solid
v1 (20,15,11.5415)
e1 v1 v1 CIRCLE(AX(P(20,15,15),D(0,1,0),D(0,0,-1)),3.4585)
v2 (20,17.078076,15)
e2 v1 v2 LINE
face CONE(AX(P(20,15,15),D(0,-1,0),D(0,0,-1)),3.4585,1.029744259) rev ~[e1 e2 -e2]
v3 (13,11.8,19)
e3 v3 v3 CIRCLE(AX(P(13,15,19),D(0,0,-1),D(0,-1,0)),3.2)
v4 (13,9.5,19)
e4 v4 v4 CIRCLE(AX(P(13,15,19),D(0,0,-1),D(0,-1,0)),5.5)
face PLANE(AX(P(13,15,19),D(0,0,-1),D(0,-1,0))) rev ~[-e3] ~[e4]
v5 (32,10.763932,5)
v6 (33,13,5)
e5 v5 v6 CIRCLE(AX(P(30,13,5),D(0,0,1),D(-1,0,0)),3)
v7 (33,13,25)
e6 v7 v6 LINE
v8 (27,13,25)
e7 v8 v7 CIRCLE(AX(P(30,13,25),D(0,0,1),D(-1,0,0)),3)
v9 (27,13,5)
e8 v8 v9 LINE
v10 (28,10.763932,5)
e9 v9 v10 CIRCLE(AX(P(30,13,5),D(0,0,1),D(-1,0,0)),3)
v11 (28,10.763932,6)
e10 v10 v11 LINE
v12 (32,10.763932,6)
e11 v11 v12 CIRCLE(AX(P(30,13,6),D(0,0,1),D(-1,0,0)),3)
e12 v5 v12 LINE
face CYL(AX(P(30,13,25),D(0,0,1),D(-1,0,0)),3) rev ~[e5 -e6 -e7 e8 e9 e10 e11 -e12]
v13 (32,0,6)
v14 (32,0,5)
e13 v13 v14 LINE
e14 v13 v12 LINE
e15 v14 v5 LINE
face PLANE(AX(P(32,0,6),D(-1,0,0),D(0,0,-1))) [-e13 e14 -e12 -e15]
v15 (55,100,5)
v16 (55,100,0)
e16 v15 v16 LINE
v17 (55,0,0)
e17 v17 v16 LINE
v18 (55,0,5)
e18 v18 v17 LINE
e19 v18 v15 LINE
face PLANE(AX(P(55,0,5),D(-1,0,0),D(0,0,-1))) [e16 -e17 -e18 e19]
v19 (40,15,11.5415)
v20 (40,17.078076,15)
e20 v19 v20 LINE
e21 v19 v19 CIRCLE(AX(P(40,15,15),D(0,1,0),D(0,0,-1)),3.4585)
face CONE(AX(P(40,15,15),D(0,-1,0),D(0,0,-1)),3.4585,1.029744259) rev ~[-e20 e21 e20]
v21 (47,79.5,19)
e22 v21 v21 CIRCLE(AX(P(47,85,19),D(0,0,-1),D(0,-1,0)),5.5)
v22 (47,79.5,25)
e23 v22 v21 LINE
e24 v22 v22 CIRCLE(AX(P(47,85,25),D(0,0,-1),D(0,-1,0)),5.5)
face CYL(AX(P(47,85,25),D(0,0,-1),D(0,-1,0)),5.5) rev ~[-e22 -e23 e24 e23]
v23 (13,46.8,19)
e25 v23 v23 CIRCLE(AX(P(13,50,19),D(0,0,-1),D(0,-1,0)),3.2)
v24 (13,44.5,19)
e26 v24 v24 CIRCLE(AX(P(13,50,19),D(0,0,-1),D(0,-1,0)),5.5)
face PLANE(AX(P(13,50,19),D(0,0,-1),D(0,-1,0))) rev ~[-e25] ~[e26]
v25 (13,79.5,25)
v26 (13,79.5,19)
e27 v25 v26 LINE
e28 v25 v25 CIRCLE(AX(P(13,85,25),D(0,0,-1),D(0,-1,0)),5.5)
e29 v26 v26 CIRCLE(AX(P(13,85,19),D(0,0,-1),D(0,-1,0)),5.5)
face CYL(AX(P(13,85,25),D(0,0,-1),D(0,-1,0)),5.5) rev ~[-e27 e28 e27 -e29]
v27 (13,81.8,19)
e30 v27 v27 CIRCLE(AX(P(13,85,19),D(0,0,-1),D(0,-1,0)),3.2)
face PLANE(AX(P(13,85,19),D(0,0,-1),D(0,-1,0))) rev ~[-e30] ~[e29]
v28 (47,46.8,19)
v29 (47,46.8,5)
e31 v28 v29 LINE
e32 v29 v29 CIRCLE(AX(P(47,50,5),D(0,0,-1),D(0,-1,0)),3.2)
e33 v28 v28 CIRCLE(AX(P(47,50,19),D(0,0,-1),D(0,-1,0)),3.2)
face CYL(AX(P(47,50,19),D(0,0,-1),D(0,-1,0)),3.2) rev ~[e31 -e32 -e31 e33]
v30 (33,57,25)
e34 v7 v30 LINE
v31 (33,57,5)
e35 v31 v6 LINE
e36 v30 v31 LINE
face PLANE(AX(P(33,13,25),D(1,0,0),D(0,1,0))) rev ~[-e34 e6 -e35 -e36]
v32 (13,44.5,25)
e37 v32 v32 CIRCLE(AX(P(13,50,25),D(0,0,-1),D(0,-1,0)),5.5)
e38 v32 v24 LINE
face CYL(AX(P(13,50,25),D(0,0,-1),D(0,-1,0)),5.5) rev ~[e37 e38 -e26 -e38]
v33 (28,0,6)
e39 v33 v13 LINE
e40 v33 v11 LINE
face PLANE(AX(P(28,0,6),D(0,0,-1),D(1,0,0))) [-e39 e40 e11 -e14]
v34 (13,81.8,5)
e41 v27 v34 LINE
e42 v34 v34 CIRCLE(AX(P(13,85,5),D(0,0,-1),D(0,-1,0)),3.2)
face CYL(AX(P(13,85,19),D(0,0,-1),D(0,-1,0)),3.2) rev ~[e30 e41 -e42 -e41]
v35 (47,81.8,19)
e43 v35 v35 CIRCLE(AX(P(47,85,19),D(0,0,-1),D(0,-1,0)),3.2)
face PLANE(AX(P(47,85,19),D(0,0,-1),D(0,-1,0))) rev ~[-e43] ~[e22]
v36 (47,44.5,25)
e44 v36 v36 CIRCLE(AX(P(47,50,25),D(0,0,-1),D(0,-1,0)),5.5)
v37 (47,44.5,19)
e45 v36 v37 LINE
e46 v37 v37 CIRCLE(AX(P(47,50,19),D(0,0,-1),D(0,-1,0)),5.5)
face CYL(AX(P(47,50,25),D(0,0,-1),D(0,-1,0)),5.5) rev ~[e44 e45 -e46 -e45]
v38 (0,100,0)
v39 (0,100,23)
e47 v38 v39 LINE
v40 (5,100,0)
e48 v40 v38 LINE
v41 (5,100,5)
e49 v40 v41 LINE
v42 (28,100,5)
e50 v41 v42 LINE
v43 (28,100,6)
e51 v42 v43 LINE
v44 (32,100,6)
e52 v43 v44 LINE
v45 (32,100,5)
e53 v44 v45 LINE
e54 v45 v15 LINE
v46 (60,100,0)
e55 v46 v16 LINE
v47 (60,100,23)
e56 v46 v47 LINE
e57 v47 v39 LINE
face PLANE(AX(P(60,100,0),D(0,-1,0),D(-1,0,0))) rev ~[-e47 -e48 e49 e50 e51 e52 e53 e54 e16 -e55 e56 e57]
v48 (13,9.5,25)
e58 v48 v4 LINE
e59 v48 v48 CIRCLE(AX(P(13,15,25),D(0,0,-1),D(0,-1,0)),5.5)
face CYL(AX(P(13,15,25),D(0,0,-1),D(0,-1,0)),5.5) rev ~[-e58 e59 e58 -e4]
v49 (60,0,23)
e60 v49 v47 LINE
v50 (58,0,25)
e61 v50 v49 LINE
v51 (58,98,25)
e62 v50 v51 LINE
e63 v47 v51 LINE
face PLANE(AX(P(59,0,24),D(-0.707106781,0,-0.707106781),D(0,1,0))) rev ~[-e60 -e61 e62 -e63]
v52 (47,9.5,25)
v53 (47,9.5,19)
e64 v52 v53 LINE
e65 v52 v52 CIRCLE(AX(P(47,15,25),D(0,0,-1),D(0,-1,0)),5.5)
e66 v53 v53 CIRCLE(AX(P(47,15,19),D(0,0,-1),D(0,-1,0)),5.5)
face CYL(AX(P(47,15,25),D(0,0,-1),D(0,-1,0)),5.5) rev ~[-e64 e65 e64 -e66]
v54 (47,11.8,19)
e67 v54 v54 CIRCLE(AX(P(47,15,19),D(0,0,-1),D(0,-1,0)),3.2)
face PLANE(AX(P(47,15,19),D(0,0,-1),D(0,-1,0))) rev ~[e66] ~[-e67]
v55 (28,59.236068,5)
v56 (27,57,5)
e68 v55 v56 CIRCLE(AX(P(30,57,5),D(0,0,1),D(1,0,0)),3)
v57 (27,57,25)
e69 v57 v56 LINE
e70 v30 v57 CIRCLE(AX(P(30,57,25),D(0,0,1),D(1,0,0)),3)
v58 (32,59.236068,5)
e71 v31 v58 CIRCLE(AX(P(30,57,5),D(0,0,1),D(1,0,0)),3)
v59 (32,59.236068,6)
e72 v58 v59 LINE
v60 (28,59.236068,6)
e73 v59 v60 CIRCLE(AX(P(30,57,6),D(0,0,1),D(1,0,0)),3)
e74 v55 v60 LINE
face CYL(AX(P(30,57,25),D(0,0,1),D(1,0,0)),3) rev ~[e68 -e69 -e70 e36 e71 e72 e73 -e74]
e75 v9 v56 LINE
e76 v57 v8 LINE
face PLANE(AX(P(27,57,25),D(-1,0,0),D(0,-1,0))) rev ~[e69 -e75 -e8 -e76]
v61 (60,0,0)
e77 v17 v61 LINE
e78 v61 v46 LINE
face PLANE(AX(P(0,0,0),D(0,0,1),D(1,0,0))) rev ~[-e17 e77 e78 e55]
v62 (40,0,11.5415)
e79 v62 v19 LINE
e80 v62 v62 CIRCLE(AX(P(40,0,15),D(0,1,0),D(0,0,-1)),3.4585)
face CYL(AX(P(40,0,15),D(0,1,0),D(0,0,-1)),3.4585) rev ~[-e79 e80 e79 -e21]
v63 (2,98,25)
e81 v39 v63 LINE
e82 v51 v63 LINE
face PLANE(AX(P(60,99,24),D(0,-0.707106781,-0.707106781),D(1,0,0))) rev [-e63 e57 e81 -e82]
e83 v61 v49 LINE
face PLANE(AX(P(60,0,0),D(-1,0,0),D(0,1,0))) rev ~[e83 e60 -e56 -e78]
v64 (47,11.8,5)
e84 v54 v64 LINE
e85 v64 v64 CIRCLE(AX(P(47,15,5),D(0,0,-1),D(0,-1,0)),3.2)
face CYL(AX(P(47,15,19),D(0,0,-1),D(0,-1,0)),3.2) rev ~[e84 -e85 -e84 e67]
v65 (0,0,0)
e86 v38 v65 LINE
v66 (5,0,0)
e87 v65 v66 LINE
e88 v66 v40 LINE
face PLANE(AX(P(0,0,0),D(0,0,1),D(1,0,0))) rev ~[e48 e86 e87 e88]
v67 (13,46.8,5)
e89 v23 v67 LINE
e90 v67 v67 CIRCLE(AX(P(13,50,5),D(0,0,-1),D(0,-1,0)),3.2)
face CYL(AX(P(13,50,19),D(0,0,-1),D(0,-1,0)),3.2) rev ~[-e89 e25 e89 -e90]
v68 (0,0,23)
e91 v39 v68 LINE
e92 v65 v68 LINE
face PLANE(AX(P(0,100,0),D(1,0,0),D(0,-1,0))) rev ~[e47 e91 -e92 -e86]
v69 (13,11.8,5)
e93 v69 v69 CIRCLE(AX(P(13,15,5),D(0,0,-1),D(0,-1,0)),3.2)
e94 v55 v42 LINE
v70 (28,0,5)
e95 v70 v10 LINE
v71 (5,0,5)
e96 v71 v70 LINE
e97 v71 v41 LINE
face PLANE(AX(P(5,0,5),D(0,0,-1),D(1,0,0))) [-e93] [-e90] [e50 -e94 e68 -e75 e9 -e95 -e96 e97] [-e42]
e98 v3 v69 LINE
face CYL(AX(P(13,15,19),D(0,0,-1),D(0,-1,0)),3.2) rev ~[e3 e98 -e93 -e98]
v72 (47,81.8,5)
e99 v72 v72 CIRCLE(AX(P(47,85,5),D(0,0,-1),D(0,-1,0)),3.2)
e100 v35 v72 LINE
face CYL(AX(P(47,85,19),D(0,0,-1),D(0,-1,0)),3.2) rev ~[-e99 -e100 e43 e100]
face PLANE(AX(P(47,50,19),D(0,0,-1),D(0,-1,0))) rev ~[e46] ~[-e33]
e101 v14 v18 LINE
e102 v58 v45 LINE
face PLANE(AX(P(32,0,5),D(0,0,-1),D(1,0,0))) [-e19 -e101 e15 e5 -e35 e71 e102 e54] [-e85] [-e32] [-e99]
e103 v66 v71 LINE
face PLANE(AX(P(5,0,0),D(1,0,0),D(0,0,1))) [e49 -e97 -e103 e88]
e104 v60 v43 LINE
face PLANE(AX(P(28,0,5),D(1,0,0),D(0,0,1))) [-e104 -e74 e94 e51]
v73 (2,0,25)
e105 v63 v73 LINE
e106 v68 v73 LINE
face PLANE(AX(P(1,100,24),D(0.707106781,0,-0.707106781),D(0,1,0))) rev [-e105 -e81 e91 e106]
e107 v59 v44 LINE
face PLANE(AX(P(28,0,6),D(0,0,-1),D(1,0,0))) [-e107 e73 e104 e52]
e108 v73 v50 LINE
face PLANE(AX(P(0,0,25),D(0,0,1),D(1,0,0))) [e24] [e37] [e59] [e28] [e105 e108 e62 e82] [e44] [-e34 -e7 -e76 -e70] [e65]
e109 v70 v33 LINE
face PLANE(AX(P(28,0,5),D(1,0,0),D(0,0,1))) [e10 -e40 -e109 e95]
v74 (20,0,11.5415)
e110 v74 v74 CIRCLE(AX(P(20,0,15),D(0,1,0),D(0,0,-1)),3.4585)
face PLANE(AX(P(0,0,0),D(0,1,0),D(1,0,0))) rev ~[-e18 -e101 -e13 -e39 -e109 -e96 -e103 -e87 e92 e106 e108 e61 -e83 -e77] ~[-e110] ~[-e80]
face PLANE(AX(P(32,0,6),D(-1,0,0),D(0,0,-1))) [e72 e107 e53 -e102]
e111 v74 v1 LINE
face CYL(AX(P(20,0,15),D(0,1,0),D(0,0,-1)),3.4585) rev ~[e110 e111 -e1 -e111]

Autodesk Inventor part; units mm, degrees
ref_plane "YZ Plane" through (0, 0, 0) normal (1, 0, 0) x (0, 1, 0)
ref_plane "XZ Plane" through (0, 0, 0) normal (0, 1, 0) x (-1, 0, 0)
ref_plane "XY Plane" through (0, 0, 0) normal (0, 0, 1) x (1, 0, 0)
sketch "Sketch3" plane through (0, 0, 0) normal (0, 0, 1) x (1, 0, 0)
  line L0 (0, 0) -> (60, 0)
  line L1 (60, 0) -> (60, 100)
  line L2 (60, 100) -> (0, 100)
  line L3 (0, 100) -> (0, 0)
  dimension "d6" = 60
  dimension "d7" = 100
extrude "Extrusion1" add sketch "Sketch3" along normal blind 25
sketch "Sketch4" plane through (0, 0, 0) normal (0, -1, 0) x (1, 0, 0)
  line L0 (60, 0) -> (0, 0) projected
  line L1 (5, 0) -> (5, 5)
  line L2 (5, 5) -> (28, 5)
  line L3 (28, 5) -> (28, 6)
  line L4 (28, 6) -> (32, 6)
  line L5 (32, 6) -> (32, 5)
  line L6 (32, 5) -> (55, 5)
  line L7 (55, 5) -> (55, 0)
  line L8 (55, 0) -> (5, 0)
  line L9 (0, 0) -> (0, 25) projected
  dimension "d14" = 5
  dimension "d15" = 23
  dimension "d16" = 1
  dimension "d17" = 4
  dimension "d18" = 1
  dimension "d19" = 23
  dimension "d20" = 5
  dimension "d21" = 5
extrude "Extrusion2" cut sketch "Sketch4" against normal through all
sketch "Sketch5" plane through (0, 0, 25) normal (0, 0, 1) x (1, 0, 0)
  line L0 (0, 0) -> (60, 0) projected
  line L1 (0, 100) -> (0, 0) projected
  point P0 (47, 15)
  point P1 (47, 50)
  point P2 (47, 85)
  point P3 (13, 15)
  point P4 (13, 50)
  point P5 (13, 85)
  dimension "d24" = 15
  dimension "d25" = 47
  dimension "d28" = 35
  dimension "d31" = 34
hole "Hole1" at (47, 15, 25) at (47, 50, 25) at (47, 85, 25) at (13, 15, 25) at (13, 50, 25) at (13, 85, 25) direction (0, 0, -1) diameter 6.4 end through all counterbore diameter 11 counterbore depth 6
sketch "Sketch6" plane through (0, 0, 25) normal (0, -1, 0) x (1, 0, 0)
  line L0 (0, 0) -> (60, 0) projected
  line L1 (0, -25) -> (0, 0) projected
  point P0 (20, -10)
  point P1 (40, -10)
  dimension "d41" = 10
  dimension "d42" = 10
  dimension "d43" = 20
  dimension "d44" = 20
hole "Hole2" at (20, 0, 15) at (40, 0, 15) direction (0, 1, 0) diameter 6.917 depth 15 tip angle 118 thread size "M8x1" class "6H" standard "ISO Metric profile"
sketch "Sketch7" plane through (0, 0, 25) normal (0, 0, 1) x (1, 0, 0)
  line L0 (30, 13) -> (30, 57) construction
  line L1 (33, 13) -> (33, 57)
  line L2 (27, 57) -> (27, 13)
  arc A0 (27, 13) -> (33, 13) centre (30, 13) ccw
  arc A1 (33, 57) -> (27, 57) centre (30, 57) ccw
  line L3 (0, 0) -> (60, 0) projected
  point P0 (30, 35)
  dimension "d52" = 44
  dimension "d53" = 6
  dimension "d54" = 30
  dimension "d55" = 13
extrude "Extrusion3" cut sketch "Sketch7" against normal through all
chamfer "Chamfer2" distance 2 angle 45 3 edges at (0, 50, 25) (30, 100, 25) (60, 50, 25)
